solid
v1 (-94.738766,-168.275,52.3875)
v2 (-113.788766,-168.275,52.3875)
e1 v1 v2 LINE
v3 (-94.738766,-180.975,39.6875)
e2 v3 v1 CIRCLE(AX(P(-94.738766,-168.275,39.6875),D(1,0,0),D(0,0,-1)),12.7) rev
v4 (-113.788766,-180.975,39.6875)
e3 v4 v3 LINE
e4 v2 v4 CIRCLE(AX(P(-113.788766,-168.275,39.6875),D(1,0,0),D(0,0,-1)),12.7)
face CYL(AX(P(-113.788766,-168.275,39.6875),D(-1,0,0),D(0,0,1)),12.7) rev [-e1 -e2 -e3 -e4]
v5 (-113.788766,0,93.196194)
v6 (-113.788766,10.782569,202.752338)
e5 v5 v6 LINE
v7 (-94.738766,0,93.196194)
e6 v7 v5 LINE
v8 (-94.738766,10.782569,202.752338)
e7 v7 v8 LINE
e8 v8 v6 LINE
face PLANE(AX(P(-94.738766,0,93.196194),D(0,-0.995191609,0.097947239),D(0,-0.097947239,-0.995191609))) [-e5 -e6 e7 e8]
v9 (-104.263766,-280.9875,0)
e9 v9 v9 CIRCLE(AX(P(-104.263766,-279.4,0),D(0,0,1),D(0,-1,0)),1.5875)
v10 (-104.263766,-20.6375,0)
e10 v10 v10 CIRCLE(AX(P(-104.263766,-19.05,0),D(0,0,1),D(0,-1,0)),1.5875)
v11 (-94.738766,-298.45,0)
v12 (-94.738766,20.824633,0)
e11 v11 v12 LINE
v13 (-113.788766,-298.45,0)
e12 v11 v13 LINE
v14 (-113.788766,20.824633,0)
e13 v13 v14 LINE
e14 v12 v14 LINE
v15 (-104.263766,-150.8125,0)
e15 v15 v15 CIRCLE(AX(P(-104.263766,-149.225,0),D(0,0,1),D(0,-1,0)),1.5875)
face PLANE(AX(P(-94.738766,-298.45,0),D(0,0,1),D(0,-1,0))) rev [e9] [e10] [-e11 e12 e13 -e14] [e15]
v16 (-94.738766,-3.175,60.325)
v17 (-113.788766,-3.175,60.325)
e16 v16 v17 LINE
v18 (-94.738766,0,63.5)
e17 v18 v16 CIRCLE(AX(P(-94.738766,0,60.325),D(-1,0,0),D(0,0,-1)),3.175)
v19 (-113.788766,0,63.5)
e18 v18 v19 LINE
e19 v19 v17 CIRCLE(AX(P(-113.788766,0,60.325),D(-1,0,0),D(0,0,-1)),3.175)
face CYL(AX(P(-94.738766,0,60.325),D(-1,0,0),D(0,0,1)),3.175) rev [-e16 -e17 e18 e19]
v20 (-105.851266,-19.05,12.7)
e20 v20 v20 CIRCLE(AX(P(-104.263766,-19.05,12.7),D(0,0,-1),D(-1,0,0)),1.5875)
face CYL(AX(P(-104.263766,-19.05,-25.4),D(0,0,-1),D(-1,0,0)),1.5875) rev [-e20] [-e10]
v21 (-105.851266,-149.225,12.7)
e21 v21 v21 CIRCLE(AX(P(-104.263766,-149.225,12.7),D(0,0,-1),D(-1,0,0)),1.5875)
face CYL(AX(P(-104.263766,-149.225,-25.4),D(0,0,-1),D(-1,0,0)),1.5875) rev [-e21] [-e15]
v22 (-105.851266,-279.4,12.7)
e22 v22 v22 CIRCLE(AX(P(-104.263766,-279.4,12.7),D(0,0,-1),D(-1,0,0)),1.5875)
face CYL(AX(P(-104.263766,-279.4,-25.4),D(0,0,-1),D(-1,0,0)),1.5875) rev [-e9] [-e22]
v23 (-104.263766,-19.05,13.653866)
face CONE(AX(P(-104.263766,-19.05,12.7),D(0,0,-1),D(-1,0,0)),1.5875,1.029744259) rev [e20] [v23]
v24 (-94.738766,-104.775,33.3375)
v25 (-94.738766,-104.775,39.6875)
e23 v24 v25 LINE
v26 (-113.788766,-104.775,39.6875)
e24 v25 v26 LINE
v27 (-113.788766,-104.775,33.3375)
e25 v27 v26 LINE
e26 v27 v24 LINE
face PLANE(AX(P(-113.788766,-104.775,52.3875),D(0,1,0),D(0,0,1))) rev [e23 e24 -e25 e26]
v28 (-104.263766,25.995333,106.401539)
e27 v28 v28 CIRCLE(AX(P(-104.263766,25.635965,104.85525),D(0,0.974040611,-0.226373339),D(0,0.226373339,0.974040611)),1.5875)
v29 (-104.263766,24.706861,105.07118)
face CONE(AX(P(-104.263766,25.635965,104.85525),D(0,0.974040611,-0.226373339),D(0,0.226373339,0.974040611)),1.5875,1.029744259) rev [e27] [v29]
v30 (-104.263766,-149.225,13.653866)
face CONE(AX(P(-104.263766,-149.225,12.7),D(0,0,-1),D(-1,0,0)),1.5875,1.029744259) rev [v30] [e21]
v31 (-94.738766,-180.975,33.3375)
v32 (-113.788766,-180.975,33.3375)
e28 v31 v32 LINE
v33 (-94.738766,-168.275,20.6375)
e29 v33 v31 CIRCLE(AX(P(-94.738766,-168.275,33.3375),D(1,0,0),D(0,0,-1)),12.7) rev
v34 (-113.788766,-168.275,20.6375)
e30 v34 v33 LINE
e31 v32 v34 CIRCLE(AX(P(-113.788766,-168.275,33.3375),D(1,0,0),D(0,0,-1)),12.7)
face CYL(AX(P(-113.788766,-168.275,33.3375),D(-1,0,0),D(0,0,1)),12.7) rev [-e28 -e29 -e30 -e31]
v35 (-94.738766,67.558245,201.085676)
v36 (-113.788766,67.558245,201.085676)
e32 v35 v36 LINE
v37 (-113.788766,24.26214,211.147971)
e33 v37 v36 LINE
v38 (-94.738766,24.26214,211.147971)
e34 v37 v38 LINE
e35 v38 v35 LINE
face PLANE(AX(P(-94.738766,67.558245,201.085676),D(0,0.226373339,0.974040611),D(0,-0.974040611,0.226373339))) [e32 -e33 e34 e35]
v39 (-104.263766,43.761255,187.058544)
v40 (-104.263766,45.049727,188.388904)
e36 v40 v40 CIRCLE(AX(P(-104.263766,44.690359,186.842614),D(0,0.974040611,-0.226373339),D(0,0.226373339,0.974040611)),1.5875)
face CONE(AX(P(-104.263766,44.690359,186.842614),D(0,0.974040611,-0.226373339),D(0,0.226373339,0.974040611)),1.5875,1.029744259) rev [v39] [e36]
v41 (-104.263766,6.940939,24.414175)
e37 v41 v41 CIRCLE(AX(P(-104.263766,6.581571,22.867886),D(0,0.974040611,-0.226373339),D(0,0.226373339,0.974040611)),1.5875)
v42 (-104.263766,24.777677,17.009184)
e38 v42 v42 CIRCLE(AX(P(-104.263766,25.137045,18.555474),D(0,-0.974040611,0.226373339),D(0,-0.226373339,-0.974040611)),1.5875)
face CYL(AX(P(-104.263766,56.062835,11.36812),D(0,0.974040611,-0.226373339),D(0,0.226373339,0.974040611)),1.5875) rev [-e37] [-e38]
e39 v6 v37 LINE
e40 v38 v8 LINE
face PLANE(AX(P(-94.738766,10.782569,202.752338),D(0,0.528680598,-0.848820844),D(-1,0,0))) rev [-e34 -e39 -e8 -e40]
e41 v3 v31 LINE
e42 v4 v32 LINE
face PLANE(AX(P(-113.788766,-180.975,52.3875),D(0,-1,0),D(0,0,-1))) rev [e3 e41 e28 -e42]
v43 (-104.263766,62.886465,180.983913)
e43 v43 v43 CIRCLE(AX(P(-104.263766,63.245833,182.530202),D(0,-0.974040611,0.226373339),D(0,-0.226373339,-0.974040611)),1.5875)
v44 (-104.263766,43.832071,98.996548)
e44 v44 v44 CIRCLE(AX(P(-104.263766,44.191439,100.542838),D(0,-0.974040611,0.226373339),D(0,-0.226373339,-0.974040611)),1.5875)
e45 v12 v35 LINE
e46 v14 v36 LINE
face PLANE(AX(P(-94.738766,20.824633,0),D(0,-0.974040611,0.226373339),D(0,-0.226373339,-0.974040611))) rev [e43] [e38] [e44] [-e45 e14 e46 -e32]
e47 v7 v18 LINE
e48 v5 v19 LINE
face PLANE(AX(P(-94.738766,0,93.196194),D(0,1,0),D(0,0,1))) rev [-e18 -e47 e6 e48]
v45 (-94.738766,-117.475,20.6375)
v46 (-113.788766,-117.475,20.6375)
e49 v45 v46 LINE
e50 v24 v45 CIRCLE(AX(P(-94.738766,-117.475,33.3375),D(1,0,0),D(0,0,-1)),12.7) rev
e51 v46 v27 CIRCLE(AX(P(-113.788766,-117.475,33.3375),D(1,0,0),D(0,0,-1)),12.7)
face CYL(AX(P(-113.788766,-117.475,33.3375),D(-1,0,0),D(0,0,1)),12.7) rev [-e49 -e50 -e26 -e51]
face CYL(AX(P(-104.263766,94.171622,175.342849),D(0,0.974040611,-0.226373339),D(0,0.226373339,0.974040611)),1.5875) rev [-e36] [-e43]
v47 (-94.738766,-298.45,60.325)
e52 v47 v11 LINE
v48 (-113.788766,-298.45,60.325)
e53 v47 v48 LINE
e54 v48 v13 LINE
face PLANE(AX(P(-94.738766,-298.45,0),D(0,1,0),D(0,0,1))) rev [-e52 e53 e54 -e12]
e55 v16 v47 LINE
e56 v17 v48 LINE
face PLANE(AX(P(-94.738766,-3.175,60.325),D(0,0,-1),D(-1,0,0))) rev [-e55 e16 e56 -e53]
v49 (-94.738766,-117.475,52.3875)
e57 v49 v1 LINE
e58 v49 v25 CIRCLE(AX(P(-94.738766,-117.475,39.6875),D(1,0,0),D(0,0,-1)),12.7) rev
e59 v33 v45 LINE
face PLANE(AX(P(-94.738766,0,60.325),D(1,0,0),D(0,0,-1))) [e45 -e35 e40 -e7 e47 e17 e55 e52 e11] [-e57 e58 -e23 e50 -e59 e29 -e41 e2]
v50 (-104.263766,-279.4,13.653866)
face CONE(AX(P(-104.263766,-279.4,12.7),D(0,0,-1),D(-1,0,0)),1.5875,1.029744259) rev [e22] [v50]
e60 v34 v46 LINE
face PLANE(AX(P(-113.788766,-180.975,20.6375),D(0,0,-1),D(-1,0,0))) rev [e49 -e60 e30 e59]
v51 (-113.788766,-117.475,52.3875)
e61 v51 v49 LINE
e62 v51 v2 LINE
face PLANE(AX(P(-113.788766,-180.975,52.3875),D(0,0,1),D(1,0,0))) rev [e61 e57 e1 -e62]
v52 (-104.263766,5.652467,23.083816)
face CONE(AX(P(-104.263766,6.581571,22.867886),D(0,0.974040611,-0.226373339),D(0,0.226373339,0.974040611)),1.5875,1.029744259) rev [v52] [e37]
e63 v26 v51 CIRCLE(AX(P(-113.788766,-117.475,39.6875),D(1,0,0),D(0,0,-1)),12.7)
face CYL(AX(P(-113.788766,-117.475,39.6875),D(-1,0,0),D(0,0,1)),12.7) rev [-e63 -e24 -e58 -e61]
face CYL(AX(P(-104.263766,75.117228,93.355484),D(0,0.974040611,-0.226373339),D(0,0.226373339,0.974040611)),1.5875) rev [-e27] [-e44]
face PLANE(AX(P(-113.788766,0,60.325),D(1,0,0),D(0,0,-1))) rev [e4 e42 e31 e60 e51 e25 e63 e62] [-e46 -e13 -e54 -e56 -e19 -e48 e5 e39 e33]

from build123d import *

# Parameters (mm, degrees)
BOSS_EXTRUDE1_DEPTH = 19.05
BOSS_EXTRUDE2_DEPTH = 19.05
CHAMFER1_SIZE       = 12.7
CHAMFER1_SIZE2      = 11.325028866
SKETCH12_W          = 31.75
SKETCH12_H          = 76.2
CUT_EXTRUDE1_DEPTH  = 367.085742005
FILLET1_R           = 12.7


# Read off the part's stored shape, not the designer's step: Hole3, Hole4
with BuildPart() as part:
    # Sketch2 → Boss-Extrude1 (new body)
    with BuildSketch(Plane(origin=(-113.788766336, 0, 0), x_dir=(0, 0, -1), z_dir=(1, 0, 0))):
        with BuildLine():
            Line((0, 20.824633003), (-83.828599938, 40.306941911))
            Line((-83.828599938, 40.306941911), (-93.196193981, 0))
            Line((-93.196193981, 0), (-63.5, 0))
            ThreePointArc((-63.5, 0), (-58.07993597, 2.24506403), (-60.325, -3.175))
            Line((-60.325, -3.175), (-60.325, -298.45))
            Line((-60.325, -298.45), (0, -298.45))
            Line((0, -298.45), (0, 20.824633003))
        make_face()
    extrude(amount=BOSS_EXTRUDE1_DEPTH)

    # Sketch3 → Boss-Extrude2 (add, through all)
    with BuildSketch(Plane.ZY.offset(113.788766336)):
        Polygon((83.828599938, 40.306941911), (201.08567571, 67.558244849), (214.022912031, 11.891823944), (93.196193981, 0), align=None)
    extrude(amount=-BOSS_EXTRUDE2_DEPTH)

    # Chamfer1
    chamfer1_edges = [part.edges().sort_by_distance(p)[0] for p in [
        (-104.263766336, 11.891823944, 214.022912031),
    ]]
    chamfer1_side = [part.faces().sort_by_distance(p)[0] for p in [
        (-104.263766336, 39.725034397, 207.554293871),
    ]]
    chamfer(chamfer1_edges, length=CHAMFER1_SIZE, length2=CHAMFER1_SIZE2, reference=chamfer1_side[0])

    # Hole3 outline → Hole3 (revolve, cut)
    with BuildSketch(Plane(origin=(-104.263766336, 5.379568105, 23.147239101), x_dir=(1, 0, 0), z_dir=(0, 0.22637333895091205, 0.9740406107612842))):
        Polygon((0, 0.280172016), (1.5875, 1.234038249), (1.5875, 20.284038249), (0, 20.284038249), align=None)
    revolve(axis=Axis((-104.263766336, 5.379568105, 23.147239101), (0, 0.9740406107612842, -0.22637333895091205)), mode=Mode.SUBTRACT)

    # Hole3 2 outline → Hole3 2 (revolve, cut)
    with BuildSketch(Plane(origin=(-104.263766336, 24.433961921, 105.134603321), x_dir=(1, 0, 0), z_dir=(0, 0.22637333895091205, 0.9740406107612842))):
        Polygon((0, 0.280172016), (1.5875, 1.234038249), (1.5875, 20.284038249), (0, 20.284038249), align=None)
    revolve(axis=Axis((-104.263766336, 24.433961921, 105.134603321), (0, 0.9740406107612842, -0.22637333895091205)), mode=Mode.SUBTRACT)

    # Hole3 3 outline → Hole3 3 (revolve, cut)
    with BuildSketch(Plane(origin=(-104.263766336, 43.488355737, 187.121967541), x_dir=(1, 0, 0), z_dir=(0, 0.22637333895091205, 0.9740406107612842))):
        Polygon((0, 0.280172016), (1.5875, 1.234038249), (1.5875, 20.284038249), (0, 20.284038249), align=None)
    revolve(axis=Axis((-104.263766336, 43.488355737, 187.121967541), (0, 0.9740406107612842, -0.22637333895091205)), mode=Mode.SUBTRACT)

    # Hole4 outline → Hole4 (revolve, cut)
    with BuildSketch(Plane(origin=(-104.263766336, -279.4, 0), x_dir=(1, 0, 0), z_dir=(0, -1, 0))):
        Polygon((1.5875, 0), (1.5875, 12.7), (0, 13.653866233), (0, 0), align=None)
    revolve(axis=Axis((-104.263766336, -279.4, 0), (0, 0, 1)), mode=Mode.SUBTRACT)

    # Hole4 2 outline → Hole4 2 (revolve, cut)
    with BuildSketch(Plane(origin=(-104.263766336, -149.225, 0), x_dir=(1, 0, 0), z_dir=(0, -1, 0))):
        Polygon((1.5875, 0), (1.5875, 12.7), (0, 13.653866233), (0, 0), align=None)
    revolve(axis=Axis((-104.263766336, -149.225, 0), (0, 0, 1)), mode=Mode.SUBTRACT)

    # Hole4 3 outline → Hole4 3 (revolve, cut)
    with BuildSketch(Plane(origin=(-104.263766336, -19.05, 0), x_dir=(1, 0, 0), z_dir=(0, -1, 0))):
        Polygon((1.5875, 0), (1.5875, 12.7), (0, 13.653866233), (0, 0), align=None)
    revolve(axis=Axis((-104.263766336, -19.05, 0), (0, 0, 1)), mode=Mode.SUBTRACT)

    # Sketch12 → Cut-Extrude1 (cut, through all)
    with BuildSketch(Plane(origin=(-94.738766336, 0, 0), x_dir=(0, 0, -1), z_dir=(1, 0, 0))):
        with Locations((-36.5125, -142.875)):
            Rectangle(SKETCH12_W, SKETCH12_H)
    extrude(amount=-CUT_EXTRUDE1_DEPTH, mode=Mode.SUBTRACT)

    # Fillet1
    fillet1_edges = [part.edges().sort_by_distance(p)[0] for p in [
        (-104.263766336, -104.775, 20.6375),
        (-104.263766336, -180.975, 20.6375),
        (-104.263766336, -180.975, 52.3875),
        (-104.263766336, -104.775, 52.3875),
    ]]
    fillet(fillet1_edges, radius=FILLET1_R)


solid = part.part
